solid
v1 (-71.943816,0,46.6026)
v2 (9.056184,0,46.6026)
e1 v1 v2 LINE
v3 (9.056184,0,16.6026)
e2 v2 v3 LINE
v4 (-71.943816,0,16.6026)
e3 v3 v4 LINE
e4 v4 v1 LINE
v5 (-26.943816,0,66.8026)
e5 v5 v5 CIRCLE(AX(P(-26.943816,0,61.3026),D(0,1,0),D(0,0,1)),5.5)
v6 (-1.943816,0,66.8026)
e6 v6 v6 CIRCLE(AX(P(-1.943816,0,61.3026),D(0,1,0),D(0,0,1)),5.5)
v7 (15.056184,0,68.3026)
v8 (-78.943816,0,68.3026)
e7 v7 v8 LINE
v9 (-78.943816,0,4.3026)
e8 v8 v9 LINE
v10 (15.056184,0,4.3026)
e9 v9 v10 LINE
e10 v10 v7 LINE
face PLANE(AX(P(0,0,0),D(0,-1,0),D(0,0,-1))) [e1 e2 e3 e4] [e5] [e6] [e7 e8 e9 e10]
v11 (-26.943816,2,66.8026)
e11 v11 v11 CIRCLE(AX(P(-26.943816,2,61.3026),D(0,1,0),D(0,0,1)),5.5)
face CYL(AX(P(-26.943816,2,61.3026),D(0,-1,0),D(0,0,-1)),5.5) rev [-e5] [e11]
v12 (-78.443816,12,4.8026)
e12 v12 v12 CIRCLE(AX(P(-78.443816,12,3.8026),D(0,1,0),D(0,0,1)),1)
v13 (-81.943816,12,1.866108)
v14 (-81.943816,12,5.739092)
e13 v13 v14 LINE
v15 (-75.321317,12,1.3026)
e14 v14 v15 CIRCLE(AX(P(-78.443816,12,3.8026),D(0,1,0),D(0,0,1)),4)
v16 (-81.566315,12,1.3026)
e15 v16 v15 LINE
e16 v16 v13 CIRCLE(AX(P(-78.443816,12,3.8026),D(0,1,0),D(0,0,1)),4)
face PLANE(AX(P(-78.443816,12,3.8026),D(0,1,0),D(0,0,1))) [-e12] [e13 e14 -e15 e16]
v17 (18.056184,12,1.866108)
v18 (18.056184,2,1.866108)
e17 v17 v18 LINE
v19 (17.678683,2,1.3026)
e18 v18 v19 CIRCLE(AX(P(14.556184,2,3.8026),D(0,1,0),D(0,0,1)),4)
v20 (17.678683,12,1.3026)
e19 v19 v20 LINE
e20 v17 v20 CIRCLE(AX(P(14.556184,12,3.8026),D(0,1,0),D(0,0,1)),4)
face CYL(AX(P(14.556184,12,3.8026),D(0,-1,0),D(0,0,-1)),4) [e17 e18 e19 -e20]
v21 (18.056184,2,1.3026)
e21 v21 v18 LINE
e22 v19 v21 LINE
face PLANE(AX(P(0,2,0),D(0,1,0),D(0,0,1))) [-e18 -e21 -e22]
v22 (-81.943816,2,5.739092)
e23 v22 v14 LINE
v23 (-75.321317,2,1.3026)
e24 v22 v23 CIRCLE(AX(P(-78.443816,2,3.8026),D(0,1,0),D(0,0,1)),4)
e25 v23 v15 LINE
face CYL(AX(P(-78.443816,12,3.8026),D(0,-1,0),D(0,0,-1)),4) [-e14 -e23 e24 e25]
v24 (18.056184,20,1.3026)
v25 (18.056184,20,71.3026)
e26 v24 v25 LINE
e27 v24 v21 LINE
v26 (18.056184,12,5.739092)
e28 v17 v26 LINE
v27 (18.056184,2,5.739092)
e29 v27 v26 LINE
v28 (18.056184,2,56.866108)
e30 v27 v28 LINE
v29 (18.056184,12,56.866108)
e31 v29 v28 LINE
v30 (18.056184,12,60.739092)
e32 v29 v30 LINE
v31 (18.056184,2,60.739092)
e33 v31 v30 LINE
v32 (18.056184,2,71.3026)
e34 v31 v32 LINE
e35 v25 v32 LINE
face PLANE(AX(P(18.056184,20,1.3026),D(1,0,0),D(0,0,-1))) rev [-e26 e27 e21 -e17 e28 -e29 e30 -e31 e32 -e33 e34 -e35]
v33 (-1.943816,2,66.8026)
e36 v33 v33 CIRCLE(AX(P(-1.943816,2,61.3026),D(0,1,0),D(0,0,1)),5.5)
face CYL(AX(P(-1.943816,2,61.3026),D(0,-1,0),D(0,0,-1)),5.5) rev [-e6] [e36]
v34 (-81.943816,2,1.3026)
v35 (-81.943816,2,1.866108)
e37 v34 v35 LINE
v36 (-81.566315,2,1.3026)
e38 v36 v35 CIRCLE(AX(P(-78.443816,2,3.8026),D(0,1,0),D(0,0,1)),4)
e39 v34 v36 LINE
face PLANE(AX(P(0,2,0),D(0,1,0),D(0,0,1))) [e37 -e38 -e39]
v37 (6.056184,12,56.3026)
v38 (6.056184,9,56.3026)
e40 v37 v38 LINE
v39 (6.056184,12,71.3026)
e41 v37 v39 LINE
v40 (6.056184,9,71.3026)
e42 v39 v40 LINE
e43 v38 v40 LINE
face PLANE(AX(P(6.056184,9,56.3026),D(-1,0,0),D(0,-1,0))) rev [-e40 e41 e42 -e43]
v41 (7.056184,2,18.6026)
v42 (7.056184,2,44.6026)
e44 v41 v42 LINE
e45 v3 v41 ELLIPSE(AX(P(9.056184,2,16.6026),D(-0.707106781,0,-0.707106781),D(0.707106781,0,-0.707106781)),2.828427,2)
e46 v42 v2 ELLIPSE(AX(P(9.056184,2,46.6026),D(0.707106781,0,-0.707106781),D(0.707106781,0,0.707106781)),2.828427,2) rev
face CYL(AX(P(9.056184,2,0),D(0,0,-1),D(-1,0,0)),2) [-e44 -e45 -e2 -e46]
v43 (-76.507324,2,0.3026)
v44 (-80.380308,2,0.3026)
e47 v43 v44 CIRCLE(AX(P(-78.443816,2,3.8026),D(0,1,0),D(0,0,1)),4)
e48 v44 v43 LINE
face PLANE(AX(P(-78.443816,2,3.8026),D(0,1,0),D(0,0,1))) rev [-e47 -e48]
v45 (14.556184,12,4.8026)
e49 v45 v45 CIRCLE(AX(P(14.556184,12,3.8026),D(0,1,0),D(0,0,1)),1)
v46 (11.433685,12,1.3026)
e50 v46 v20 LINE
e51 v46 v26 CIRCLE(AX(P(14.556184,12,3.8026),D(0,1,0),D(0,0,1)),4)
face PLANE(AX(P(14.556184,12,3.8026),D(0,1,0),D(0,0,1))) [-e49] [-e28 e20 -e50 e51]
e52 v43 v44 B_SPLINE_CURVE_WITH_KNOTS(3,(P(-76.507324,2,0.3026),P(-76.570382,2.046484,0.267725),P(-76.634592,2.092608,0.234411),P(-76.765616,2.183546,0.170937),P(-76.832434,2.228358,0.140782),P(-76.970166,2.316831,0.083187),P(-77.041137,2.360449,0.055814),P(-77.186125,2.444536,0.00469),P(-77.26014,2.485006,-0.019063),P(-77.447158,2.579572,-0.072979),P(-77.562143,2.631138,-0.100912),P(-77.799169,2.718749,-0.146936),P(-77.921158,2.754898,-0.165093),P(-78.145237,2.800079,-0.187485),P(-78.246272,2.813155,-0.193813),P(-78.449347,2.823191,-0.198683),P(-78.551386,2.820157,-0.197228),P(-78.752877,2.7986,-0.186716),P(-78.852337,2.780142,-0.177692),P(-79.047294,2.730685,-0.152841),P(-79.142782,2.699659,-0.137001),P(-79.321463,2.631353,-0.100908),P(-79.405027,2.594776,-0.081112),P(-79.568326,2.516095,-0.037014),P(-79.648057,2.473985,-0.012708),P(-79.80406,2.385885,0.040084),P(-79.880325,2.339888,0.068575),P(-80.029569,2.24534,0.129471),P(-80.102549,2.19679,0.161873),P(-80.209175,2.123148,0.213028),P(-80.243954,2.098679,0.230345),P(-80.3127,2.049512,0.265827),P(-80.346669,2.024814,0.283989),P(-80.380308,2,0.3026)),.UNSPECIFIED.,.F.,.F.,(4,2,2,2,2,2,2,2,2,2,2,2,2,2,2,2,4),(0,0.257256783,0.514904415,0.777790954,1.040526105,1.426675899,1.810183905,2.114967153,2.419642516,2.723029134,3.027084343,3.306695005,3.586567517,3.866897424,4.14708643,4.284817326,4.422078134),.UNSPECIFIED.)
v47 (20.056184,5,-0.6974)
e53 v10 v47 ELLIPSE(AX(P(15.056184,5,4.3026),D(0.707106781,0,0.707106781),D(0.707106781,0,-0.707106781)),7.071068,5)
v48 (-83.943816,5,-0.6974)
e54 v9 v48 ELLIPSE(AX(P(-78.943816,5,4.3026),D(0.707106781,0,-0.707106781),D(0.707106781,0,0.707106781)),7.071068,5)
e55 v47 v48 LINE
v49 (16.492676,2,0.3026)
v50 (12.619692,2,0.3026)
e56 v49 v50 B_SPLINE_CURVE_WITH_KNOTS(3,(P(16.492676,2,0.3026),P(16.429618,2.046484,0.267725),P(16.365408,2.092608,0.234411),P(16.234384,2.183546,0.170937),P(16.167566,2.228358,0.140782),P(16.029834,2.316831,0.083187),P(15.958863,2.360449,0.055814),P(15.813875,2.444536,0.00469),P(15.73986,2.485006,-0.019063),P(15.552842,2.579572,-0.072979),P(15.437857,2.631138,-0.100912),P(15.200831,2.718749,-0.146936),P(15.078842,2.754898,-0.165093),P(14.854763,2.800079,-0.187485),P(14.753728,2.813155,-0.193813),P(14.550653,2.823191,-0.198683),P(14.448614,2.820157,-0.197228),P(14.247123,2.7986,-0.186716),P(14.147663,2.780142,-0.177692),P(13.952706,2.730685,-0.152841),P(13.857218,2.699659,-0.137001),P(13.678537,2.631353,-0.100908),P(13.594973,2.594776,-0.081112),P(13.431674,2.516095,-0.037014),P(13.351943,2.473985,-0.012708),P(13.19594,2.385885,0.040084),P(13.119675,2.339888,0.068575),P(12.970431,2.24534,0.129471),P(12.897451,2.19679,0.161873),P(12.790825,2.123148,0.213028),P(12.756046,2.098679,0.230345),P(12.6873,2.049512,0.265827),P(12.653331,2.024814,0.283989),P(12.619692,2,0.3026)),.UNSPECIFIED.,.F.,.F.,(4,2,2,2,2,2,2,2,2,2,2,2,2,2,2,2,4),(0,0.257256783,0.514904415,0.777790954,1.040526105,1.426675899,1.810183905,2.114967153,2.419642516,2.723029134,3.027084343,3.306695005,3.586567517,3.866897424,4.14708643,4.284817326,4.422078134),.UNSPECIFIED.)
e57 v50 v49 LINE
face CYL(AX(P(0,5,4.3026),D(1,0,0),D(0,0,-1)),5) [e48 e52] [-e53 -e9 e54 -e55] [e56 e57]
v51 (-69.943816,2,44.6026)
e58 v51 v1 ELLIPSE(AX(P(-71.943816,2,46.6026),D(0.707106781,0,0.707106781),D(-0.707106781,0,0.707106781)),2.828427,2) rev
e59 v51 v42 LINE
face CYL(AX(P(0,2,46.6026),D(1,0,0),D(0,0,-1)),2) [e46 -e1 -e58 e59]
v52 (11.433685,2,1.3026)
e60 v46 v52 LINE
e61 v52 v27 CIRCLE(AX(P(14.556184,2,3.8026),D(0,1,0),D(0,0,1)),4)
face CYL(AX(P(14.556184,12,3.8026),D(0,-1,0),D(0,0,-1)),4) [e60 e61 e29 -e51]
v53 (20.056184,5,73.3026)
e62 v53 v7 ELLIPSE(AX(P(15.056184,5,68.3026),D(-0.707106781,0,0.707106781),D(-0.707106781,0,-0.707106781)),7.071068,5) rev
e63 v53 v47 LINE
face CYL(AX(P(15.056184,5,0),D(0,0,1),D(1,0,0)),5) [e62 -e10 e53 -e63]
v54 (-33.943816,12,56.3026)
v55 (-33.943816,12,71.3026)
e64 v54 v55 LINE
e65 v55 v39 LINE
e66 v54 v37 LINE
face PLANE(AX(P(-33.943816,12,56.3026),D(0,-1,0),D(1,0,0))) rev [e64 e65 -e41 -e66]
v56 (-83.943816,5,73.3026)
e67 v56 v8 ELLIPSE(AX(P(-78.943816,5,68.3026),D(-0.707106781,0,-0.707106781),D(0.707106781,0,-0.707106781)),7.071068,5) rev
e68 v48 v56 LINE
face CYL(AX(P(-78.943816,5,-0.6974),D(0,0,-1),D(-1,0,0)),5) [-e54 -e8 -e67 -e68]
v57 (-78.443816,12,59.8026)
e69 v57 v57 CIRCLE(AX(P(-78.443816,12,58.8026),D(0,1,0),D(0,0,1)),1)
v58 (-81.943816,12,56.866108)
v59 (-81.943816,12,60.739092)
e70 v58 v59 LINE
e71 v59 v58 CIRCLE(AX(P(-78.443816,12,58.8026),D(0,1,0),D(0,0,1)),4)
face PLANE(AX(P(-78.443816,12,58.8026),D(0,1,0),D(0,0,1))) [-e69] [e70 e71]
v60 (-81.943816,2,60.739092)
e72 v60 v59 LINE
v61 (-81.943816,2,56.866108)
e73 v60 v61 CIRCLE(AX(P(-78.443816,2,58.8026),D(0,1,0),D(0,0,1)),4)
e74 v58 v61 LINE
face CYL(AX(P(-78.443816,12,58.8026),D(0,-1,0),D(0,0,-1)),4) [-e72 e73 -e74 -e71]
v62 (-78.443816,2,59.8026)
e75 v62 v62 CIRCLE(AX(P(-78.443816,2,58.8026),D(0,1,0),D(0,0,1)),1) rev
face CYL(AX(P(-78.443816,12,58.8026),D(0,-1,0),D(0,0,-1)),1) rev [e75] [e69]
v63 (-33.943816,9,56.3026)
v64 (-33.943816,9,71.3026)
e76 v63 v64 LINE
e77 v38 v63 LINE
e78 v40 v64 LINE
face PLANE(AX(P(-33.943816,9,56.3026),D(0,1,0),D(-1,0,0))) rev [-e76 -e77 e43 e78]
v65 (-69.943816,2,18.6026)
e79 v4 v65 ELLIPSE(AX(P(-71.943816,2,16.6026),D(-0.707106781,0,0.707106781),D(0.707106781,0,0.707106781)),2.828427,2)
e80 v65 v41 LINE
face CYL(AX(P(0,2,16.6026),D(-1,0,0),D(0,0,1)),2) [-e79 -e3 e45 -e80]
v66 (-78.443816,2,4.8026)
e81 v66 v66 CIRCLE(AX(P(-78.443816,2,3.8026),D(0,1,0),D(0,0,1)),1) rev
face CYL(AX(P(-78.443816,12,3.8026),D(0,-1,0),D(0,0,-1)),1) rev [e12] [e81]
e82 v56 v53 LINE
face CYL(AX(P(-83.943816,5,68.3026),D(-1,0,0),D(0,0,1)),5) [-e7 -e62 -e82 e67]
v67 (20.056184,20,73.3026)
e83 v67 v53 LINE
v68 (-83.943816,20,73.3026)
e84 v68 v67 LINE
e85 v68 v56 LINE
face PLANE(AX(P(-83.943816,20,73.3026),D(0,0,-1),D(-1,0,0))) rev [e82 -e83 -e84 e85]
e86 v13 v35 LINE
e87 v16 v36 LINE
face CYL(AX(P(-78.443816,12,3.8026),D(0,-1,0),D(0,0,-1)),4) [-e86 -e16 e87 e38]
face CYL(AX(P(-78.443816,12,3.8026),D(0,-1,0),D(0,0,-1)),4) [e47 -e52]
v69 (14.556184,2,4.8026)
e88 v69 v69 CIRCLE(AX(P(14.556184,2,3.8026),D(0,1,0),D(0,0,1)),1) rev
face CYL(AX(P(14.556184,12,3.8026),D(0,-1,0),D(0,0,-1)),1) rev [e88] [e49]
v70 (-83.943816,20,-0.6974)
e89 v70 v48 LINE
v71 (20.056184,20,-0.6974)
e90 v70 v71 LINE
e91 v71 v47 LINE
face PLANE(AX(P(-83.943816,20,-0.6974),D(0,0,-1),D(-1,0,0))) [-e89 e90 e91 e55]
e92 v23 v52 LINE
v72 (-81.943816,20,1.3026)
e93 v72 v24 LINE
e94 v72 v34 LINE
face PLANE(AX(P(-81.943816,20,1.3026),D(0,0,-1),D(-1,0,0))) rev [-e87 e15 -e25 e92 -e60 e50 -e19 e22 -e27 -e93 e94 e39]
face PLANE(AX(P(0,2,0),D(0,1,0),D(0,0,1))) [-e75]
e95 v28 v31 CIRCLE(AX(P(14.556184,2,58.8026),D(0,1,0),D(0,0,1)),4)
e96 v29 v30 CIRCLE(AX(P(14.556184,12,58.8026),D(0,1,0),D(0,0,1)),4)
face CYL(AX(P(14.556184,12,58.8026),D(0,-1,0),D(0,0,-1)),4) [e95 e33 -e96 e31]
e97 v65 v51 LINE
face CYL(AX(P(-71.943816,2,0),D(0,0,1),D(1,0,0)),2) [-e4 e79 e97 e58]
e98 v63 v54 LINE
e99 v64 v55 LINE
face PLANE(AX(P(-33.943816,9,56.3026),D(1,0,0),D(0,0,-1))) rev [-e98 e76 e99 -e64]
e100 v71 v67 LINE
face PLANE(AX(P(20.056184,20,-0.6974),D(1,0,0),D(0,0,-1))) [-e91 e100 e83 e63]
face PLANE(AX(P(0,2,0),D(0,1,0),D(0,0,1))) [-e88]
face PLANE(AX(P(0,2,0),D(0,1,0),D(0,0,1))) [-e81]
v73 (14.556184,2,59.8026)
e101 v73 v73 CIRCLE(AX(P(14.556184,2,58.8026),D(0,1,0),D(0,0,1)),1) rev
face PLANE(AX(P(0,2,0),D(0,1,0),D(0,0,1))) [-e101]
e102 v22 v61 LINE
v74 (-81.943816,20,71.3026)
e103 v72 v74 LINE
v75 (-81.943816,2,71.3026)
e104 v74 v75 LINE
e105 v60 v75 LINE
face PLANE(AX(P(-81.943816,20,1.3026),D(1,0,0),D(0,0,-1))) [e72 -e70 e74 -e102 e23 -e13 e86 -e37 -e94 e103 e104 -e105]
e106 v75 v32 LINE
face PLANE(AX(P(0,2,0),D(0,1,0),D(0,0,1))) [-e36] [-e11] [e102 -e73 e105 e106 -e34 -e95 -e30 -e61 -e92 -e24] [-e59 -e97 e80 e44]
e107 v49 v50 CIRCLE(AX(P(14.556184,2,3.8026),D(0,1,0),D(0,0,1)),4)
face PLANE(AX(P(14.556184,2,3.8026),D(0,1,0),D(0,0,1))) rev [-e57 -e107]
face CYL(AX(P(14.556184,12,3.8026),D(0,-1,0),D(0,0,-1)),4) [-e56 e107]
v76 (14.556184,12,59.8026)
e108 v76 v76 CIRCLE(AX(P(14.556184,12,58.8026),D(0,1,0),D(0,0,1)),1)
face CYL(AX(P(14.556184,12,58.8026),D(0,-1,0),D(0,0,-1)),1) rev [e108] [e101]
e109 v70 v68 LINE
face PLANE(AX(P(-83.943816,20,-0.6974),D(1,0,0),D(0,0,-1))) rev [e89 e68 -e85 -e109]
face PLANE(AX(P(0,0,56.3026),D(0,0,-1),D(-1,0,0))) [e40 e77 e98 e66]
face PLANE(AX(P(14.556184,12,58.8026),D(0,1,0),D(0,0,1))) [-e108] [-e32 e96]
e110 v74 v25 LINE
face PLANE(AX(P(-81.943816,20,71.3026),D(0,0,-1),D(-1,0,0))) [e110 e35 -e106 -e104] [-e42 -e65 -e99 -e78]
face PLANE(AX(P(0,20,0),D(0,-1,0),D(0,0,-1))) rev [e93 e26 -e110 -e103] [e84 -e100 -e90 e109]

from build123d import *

# Parameters (mm, degrees)
SKETCH1_W           = 104
SKETCH1_H           = 74
SKETCH1_W_2         = 100
SKETCH1_H_2         = 70
BOSS_EXTRUDE2_DEPTH = 20
SKETCH1_3_W         = 100
SKETCH1_3_H         = 70
SKETCH1_3_R         = 5.5
SKETCH1_3_W_2       = 77
SKETCH1_3_H_2       = 26
BOSS_EXTRUDE3_DEPTH = 2
FILLET1_R           = 5
FILLET2_R           = 2
SKETCH3_R           = 4
SKETCH3_R_2         = 1
BOSS_EXTRUDE4_DEPTH = 10
SKETCH4_W           = 40
SKETCH4_H           = 3
BOSS_EXTRUDE5_DEPTH = 15


with BuildPart() as part:
    # Sketch1 → Boss-Extrude2 (new body)
    with BuildSketch(Plane(origin=(0, 0, 0), x_dir=(1, 0, 0), z_dir=(0, 1, 0))):
        with Locations((-31.943816067, -36.302599947)):
            Rectangle(SKETCH1_W, SKETCH1_H)
        with Locations((-31.943816067, -36.302599947)):
            Rectangle(SKETCH1_W_2, SKETCH1_H_2, mode=Mode.SUBTRACT)
    extrude(amount=BOSS_EXTRUDE2_DEPTH)

    # Sketch1<3> → Boss-Extrude3 (add)
    with BuildSketch(Plane(origin=(0, 0, 0), x_dir=(1, 0, 0), z_dir=(0, 1, 0))):
        with Locations((-31.943816067, -36.302599947)):
            Rectangle(SKETCH1_3_W, SKETCH1_3_H)
        with Locations(Location((-1.943816067, -61.302599947, 0), (0, 0, 270))):
            Circle(SKETCH1_3_R, mode=Mode.SUBTRACT)
        with Locations(Location((-26.943816067, -61.302599947, 0), (0, 0, 270))):
            Circle(SKETCH1_3_R, mode=Mode.SUBTRACT)
        with Locations((-31.443816067, -31.602599947)):
            Rectangle(SKETCH1_3_W_2, SKETCH1_3_H_2, mode=Mode.SUBTRACT)
    extrude(amount=BOSS_EXTRUDE3_DEPTH)

    # Fillet1
    fillet1_edges = [part.edges().sort_by_distance(p)[0] for p in [
        (-83.943816067, 0, 36.302599947),
        (-31.943816067, 0, 73.302599947),
        (20.056183933, 0, 36.302599947),
        (-31.943816067, 0, -0.697400053),
    ]]
    fillet(fillet1_edges, radius=FILLET1_R)

    # Fillet2
    fillet2_edges = [part.edges().sort_by_distance(p)[0] for p in [
        (-69.943816067, 0, 31.602599947),
        (-31.443816067, 0, 44.602599947),
        (7.056183933, 0, 31.602599947),
        (-31.443816067, 0, 18.602599947),
    ]]
    fillet(fillet2_edges, radius=FILLET2_R - 0.0001)  # a hair under: the kernel refuses the full size

    # Sketch3 → Boss-Extrude4 (add)
    # profile 1 of 4: a face of its own
    with BuildSketch(Plane(origin=(0, 2, 0), x_dir=(1, 0, 0), z_dir=(0, 1, 0))):
        with Locations((-78.443816067, -3.802599947)):
            Circle(SKETCH3_R)
        with Locations(Location((-78.443816067, -3.802599947, 0), (0, 0, 270))):
            Circle(SKETCH3_R_2, mode=Mode.SUBTRACT)
    # profile 2 of 4: a face of its own
    with BuildSketch(Plane(origin=(0, 2, 0), x_dir=(1, 0, 0), z_dir=(0, 1, 0))):
        with Locations((14.556183933, -3.802599947)):
            Circle(SKETCH3_R)
        with Locations(Location((14.556183933, -3.802599947, 0), (0, 0, 270))):
            Circle(SKETCH3_R_2, mode=Mode.SUBTRACT)
    # profile 3 of 4: a face of its own
    with BuildSketch(Plane(origin=(0, 2, 0), x_dir=(1, 0, 0), z_dir=(0, 1, 0))):
        with Locations((-78.443816067, -58.802599947)):
            Circle(SKETCH3_R)
        with Locations(Location((-78.443816067, -58.802599947, 0), (0, 0, 270))):
            Circle(SKETCH3_R_2, mode=Mode.SUBTRACT)
    # profile 4 of 4: a face of its own
    with BuildSketch(Plane(origin=(0, 2, 0), x_dir=(1, 0, 0), z_dir=(0, 1, 0))):
        with Locations((14.556183933, -58.802599947)):
            Circle(SKETCH3_R)
        with Locations(Location((14.556183933, -58.802599947, 0), (0, 0, 270))):
            Circle(SKETCH3_R_2, mode=Mode.SUBTRACT)
    extrude(amount=BOSS_EXTRUDE4_DEPTH)

    # Sketch4 → Boss-Extrude5 (add)
    with BuildSketch(Plane(origin=(0, 0, 71.302599947), x_dir=(-1, 0, 0), z_dir=(0, 0, -1))):
        with Locations((13.943816067, 10.5)):
            Rectangle(SKETCH4_W, SKETCH4_H)
    extrude(amount=BOSS_EXTRUDE5_DEPTH)


solid = part.part
